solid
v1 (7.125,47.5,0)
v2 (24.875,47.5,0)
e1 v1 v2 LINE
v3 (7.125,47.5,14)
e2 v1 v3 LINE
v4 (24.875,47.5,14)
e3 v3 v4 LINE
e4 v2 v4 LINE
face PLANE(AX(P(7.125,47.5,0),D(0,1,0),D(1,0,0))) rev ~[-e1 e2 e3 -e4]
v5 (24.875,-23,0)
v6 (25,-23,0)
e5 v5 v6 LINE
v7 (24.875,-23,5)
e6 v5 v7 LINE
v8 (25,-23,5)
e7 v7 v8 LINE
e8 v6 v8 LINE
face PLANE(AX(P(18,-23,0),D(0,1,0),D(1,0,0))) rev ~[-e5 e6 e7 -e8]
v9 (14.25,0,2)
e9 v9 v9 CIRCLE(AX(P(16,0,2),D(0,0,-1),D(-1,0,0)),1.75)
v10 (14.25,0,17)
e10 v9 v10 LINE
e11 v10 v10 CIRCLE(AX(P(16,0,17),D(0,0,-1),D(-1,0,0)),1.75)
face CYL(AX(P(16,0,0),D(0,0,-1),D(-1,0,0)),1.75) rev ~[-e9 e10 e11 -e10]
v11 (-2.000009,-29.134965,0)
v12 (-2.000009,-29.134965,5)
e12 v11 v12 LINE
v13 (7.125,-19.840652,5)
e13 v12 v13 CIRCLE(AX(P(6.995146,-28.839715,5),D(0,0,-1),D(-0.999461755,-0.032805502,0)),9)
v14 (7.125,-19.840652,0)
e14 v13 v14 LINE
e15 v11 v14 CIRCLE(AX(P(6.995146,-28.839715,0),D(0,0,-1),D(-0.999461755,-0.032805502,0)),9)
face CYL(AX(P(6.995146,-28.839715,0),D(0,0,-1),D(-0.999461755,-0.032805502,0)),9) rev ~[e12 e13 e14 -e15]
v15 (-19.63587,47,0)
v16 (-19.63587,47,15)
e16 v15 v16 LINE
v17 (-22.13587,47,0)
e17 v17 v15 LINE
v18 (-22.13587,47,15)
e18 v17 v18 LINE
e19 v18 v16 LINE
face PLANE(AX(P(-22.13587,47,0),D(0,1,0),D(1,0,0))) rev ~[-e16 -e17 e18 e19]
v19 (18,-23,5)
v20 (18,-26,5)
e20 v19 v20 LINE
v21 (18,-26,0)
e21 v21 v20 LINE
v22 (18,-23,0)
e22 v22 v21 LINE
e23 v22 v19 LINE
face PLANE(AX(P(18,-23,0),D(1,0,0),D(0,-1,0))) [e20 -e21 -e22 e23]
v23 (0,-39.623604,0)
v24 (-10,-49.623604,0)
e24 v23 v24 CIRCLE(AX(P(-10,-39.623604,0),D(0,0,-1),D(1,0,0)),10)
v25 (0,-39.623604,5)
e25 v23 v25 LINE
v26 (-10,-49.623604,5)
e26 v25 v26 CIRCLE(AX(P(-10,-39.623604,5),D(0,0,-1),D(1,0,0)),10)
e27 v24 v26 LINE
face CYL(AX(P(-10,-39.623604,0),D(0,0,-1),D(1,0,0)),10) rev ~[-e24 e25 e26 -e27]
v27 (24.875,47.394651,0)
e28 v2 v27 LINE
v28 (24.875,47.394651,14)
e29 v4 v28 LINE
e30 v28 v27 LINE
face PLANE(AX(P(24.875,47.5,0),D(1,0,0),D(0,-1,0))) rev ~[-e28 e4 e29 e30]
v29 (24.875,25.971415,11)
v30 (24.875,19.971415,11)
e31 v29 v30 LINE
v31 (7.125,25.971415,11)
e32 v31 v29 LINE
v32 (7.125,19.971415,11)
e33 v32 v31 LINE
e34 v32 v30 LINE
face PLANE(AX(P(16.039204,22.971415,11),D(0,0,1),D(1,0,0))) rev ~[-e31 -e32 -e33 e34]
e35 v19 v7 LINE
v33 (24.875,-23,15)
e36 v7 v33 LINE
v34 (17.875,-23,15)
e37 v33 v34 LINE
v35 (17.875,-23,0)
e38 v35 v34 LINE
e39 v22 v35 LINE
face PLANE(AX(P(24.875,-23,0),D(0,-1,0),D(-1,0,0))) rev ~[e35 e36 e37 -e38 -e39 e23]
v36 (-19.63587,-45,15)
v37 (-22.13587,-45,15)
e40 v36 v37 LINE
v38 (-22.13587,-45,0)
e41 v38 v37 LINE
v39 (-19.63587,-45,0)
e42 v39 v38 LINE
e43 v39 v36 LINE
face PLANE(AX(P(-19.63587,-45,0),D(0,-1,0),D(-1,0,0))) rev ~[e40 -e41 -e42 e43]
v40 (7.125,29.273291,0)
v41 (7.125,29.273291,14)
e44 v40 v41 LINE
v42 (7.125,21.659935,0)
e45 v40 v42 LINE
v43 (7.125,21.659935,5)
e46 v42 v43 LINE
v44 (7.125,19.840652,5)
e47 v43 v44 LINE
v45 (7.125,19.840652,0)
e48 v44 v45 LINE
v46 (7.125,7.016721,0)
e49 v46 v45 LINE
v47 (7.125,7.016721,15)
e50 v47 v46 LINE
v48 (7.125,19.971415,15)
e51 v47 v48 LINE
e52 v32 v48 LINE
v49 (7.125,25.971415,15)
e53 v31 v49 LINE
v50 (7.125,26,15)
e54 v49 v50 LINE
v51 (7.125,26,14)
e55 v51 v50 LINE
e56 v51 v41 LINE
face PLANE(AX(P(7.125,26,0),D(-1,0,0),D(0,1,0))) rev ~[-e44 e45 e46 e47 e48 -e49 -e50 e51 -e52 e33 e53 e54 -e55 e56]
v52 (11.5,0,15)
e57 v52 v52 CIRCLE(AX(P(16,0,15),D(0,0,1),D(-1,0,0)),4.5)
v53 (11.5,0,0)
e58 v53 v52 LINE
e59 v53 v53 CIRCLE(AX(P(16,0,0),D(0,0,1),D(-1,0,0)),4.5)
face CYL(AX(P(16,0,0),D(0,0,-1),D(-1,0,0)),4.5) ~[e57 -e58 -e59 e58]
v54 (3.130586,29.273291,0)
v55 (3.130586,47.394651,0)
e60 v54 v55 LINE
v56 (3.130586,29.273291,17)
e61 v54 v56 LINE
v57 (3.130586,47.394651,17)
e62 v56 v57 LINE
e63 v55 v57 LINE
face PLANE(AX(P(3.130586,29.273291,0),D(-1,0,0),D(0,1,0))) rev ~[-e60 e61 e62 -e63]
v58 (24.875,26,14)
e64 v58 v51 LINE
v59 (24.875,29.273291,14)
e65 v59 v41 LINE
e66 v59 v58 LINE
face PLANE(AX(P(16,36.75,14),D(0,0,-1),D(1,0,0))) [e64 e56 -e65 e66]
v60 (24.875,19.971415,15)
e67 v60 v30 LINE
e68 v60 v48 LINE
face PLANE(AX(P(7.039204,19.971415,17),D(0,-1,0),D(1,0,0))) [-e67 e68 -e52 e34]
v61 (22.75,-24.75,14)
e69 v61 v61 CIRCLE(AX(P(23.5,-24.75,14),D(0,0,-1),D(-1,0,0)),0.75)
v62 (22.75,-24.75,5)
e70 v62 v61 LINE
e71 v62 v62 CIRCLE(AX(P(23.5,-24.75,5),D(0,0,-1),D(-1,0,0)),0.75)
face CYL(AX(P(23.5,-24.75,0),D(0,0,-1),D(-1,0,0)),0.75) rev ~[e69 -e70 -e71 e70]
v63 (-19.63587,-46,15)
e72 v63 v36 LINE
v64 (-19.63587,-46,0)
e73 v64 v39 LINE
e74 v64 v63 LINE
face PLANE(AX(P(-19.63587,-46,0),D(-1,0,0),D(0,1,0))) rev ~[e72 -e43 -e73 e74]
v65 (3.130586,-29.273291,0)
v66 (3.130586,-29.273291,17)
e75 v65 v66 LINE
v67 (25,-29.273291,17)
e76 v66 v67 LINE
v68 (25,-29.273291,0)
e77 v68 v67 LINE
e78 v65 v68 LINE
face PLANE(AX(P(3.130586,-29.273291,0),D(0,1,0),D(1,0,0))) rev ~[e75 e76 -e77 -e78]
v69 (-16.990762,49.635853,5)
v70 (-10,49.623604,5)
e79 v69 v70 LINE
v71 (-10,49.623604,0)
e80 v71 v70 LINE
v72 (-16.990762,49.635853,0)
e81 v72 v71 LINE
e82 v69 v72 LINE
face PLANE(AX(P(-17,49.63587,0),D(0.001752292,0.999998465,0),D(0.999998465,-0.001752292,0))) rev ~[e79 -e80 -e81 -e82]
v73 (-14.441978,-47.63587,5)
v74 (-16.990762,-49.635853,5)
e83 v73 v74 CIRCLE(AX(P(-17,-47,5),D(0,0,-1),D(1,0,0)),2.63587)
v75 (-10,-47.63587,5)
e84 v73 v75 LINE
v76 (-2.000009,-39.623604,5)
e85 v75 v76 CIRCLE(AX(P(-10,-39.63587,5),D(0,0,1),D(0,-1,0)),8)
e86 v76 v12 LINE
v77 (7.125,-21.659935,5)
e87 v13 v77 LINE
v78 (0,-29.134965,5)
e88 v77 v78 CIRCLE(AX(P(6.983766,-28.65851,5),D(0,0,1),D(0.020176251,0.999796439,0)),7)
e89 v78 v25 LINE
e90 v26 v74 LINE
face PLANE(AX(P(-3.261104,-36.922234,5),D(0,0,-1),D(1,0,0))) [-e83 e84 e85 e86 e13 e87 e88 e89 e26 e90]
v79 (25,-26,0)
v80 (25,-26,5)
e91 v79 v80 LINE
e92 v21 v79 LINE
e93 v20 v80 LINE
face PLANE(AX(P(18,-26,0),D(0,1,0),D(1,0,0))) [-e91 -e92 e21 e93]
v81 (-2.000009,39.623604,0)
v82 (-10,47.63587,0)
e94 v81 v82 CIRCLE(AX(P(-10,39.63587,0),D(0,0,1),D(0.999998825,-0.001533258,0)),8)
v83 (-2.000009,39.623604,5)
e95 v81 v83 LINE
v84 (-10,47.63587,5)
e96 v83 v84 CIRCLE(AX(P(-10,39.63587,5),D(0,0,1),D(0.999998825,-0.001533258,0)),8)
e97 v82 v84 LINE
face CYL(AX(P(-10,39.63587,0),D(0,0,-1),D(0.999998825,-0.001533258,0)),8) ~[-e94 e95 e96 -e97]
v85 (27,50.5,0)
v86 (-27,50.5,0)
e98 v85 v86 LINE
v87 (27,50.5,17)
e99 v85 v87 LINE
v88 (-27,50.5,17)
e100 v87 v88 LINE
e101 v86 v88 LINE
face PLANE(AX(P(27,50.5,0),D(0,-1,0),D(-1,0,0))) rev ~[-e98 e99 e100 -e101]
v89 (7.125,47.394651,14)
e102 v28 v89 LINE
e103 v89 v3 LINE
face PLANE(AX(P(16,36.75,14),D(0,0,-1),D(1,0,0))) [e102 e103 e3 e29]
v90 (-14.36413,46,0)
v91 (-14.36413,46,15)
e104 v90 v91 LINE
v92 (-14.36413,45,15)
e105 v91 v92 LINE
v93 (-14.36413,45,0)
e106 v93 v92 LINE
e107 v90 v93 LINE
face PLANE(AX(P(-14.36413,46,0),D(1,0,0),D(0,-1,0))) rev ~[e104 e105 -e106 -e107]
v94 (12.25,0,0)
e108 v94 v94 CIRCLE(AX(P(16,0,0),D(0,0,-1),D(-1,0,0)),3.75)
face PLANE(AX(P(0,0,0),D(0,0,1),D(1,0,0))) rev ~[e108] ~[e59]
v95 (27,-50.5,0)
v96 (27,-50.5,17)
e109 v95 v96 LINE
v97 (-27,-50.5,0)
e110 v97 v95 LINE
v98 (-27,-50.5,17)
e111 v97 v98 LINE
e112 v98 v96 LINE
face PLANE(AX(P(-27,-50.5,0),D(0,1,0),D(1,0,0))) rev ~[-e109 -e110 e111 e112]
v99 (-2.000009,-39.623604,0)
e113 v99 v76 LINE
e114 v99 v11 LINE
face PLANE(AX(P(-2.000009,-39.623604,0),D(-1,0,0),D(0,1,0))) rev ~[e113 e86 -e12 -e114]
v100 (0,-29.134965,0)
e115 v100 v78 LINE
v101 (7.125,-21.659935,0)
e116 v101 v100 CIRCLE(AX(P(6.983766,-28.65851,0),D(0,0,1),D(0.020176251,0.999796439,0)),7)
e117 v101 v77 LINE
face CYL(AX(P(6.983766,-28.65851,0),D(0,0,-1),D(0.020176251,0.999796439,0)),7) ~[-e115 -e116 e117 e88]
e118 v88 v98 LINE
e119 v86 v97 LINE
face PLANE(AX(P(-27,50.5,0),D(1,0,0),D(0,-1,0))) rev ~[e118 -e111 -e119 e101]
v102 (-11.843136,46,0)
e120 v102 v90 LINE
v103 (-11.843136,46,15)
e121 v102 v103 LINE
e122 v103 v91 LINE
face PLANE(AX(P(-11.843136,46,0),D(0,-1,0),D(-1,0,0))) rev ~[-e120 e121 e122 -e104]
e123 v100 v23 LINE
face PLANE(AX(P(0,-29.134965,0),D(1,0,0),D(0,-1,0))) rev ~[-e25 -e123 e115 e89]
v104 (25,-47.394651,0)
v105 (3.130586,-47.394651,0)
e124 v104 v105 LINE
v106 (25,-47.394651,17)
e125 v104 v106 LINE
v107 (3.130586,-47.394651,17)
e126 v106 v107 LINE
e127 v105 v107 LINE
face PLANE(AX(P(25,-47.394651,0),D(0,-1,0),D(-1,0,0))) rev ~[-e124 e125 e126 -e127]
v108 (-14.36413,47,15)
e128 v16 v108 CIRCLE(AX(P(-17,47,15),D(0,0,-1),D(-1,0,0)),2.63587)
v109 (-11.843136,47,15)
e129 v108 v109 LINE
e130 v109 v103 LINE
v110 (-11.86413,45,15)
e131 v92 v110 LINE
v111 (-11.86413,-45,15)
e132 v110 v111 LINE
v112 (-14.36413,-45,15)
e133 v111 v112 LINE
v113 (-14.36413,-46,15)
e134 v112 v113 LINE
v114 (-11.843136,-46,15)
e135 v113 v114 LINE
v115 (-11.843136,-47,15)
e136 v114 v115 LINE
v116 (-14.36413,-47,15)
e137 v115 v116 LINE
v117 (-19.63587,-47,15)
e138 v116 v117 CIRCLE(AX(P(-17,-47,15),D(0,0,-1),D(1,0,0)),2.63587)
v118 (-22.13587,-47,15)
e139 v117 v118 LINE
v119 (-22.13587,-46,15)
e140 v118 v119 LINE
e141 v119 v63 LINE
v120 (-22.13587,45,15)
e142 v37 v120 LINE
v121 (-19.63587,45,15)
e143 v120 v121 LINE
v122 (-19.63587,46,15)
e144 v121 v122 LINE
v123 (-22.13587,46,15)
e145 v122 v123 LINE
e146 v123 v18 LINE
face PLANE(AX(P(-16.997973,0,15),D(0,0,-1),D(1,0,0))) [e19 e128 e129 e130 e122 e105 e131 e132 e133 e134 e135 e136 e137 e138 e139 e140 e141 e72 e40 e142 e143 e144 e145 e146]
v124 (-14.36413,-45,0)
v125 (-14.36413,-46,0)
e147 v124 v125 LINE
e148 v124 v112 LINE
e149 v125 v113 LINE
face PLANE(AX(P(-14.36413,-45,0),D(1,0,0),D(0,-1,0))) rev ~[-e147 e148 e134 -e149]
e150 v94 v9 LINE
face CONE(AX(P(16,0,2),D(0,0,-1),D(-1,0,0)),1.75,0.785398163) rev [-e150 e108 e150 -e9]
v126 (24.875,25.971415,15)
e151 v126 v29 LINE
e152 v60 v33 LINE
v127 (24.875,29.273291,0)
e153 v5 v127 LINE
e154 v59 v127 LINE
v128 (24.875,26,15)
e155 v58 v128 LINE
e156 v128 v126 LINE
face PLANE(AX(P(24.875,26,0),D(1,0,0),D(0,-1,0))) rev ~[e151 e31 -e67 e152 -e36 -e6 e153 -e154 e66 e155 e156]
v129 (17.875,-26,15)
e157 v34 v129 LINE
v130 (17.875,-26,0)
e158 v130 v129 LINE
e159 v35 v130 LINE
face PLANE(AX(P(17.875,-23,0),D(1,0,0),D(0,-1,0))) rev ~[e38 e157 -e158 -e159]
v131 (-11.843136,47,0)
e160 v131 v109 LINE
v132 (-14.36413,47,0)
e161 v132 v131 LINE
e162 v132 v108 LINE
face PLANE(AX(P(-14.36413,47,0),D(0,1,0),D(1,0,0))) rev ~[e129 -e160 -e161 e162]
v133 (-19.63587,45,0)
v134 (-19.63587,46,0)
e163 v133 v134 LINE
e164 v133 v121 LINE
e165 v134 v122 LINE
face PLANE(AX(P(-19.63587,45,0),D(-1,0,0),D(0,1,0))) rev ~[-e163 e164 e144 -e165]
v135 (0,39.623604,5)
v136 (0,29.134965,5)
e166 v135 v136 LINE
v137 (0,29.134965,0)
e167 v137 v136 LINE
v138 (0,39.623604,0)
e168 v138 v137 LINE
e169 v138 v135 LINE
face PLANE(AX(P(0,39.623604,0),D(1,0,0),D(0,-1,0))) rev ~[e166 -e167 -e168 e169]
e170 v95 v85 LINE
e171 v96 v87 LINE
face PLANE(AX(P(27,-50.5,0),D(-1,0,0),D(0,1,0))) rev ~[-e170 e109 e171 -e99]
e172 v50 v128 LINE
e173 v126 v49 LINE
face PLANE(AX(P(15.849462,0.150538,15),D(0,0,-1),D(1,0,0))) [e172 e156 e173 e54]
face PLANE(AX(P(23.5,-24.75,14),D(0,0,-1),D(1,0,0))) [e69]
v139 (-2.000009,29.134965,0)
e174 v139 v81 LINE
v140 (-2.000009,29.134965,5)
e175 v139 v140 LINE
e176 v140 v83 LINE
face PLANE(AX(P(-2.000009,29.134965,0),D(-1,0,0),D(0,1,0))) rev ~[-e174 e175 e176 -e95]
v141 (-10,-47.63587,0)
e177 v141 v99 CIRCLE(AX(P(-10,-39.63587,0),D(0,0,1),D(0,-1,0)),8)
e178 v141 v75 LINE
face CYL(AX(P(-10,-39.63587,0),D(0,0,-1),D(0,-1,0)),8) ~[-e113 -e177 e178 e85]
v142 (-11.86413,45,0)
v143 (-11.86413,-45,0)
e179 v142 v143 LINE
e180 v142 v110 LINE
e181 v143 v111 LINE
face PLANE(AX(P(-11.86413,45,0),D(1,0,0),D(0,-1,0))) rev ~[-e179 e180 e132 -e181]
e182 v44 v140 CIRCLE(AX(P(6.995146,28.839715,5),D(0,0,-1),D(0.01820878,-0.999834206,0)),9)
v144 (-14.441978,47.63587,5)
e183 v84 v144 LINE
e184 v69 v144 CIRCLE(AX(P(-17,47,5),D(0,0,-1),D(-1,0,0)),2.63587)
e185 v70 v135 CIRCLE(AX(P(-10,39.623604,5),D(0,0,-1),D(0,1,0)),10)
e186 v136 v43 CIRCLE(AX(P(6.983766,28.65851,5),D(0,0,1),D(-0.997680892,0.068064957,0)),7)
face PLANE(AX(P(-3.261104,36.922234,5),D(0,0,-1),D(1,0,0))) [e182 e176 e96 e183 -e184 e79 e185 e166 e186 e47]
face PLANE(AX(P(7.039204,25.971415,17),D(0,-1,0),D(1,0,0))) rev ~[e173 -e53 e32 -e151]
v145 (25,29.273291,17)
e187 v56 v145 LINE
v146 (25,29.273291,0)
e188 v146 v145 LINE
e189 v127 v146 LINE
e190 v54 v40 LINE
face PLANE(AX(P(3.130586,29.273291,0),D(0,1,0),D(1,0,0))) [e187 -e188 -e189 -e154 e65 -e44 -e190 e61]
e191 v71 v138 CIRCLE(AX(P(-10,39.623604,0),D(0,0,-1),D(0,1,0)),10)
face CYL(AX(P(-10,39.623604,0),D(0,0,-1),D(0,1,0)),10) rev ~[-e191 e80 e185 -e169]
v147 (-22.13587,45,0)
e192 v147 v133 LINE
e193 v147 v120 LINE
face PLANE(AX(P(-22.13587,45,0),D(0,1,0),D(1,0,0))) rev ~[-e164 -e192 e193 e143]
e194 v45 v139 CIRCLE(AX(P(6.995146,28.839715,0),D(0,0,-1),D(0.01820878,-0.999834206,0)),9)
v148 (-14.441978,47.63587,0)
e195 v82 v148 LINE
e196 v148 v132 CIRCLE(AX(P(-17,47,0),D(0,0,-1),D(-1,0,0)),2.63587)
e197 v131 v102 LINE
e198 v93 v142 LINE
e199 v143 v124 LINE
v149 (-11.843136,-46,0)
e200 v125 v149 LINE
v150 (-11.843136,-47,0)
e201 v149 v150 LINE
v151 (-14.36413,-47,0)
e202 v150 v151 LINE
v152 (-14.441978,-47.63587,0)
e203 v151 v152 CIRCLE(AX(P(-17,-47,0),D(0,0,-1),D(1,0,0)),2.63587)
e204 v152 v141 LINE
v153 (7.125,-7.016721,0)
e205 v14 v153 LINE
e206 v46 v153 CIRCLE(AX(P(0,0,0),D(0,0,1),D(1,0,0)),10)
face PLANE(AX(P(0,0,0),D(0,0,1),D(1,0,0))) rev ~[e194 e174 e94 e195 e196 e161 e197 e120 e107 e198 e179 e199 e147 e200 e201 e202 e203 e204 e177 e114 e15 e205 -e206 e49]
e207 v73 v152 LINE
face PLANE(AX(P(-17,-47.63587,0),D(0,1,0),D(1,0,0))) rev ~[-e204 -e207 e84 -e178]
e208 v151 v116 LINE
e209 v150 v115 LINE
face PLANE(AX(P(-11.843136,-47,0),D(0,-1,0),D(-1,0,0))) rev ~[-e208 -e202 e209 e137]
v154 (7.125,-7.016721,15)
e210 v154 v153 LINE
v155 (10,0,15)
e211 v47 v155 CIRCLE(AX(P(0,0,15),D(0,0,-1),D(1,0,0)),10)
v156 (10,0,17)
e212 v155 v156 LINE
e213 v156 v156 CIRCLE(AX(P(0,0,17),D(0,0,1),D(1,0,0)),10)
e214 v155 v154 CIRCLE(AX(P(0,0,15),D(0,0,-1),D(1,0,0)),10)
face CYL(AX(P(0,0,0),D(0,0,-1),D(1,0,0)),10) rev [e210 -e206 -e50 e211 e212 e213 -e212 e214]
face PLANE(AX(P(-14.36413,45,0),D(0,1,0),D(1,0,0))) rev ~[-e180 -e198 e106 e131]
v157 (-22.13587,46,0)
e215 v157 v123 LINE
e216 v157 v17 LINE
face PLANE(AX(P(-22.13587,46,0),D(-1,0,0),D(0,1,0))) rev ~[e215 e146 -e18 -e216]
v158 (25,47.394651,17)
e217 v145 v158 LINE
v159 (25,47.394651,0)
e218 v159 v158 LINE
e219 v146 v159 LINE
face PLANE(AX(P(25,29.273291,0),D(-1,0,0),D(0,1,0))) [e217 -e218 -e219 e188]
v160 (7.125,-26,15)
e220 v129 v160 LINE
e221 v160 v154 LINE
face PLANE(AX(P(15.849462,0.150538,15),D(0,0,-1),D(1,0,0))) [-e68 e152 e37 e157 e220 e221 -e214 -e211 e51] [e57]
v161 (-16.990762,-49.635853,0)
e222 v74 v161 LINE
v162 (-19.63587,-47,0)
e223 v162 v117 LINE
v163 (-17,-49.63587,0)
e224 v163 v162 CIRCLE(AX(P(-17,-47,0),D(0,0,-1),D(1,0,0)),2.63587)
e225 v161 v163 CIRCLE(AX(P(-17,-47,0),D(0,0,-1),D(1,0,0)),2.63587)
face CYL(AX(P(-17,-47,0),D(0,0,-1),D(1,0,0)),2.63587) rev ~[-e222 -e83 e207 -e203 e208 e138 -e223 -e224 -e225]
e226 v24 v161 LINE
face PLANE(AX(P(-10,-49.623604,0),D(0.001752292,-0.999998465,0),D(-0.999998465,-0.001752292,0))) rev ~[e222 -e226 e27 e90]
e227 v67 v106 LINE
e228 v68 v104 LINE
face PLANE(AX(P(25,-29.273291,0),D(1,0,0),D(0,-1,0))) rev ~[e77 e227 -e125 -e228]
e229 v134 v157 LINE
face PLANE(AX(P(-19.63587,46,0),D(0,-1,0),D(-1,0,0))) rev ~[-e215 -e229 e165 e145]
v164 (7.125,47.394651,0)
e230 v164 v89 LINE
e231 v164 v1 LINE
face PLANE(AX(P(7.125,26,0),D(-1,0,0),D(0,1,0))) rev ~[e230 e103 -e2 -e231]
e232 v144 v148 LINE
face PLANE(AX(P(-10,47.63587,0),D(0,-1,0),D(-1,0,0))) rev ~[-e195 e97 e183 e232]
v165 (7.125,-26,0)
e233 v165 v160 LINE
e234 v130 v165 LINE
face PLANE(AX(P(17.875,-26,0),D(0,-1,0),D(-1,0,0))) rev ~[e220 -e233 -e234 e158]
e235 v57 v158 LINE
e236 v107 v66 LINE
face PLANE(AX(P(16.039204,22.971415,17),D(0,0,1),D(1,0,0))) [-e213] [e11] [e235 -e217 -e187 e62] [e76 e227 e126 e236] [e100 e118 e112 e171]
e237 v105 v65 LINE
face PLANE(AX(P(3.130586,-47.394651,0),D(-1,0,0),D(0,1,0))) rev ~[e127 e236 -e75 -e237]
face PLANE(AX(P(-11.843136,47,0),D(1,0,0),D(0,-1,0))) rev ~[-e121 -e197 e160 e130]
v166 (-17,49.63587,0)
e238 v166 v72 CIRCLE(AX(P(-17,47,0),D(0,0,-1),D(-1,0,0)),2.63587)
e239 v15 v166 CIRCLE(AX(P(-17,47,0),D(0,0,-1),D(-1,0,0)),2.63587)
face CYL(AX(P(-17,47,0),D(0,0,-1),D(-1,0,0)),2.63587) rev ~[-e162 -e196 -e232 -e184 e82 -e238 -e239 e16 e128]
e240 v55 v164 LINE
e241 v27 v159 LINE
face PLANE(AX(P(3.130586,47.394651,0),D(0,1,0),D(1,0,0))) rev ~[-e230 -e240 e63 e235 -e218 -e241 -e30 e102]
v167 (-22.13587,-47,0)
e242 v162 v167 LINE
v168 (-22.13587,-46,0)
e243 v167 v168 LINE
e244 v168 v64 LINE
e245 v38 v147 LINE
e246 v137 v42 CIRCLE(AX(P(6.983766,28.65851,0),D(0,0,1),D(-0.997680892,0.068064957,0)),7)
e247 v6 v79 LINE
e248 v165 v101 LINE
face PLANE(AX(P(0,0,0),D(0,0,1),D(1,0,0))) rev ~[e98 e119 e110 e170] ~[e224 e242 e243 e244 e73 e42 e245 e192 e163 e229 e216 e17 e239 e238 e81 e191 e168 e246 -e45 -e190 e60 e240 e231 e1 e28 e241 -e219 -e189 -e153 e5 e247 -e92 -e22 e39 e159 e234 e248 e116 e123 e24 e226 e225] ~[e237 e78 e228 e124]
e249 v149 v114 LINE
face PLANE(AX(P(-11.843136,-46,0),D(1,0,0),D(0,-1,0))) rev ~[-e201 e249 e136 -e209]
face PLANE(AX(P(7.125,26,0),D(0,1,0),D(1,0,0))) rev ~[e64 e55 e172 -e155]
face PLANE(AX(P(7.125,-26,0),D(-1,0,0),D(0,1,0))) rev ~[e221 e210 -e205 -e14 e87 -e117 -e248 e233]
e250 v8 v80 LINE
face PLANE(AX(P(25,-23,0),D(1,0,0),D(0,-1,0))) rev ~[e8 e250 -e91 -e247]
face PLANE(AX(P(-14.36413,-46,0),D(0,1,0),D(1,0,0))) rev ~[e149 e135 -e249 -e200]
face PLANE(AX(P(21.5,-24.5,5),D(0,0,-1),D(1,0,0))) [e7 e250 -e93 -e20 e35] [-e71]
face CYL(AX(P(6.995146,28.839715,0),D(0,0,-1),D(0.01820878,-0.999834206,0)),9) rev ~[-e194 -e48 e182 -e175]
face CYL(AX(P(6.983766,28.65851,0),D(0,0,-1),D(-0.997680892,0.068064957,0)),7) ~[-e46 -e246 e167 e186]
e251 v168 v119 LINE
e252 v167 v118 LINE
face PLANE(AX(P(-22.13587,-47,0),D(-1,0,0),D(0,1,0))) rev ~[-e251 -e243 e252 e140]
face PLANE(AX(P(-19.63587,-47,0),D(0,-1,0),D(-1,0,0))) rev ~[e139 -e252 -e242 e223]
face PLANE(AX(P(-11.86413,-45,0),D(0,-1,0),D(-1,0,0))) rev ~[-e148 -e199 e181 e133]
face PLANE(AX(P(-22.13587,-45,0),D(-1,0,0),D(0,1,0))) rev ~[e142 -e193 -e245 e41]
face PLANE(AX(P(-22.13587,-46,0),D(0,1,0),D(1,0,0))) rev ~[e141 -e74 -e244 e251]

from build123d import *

# Parameters (mm, degrees)
F0_R      = 10
F0_W      = 21.869414486
F0_H      = 18.1213598698
F1_DEPTH  = 17
F3_DEPTH  = 15
F4_W      = 7
F4_H      = 3
F5_DEPTH  = 5
F7_DEPTH  = 14
F8_SIZE   = 2
F9_W      = 18
F9_H      = 6
F10_DEPTH = 6


# Not quite as in the source:
# - a feature names something its author has since deleted; it is built from what else it names


with BuildPart() as f1:
    # F0 (on Top) → F1 (new body)
    with BuildSketch(Plane.XY):
        Polygon((27, -38.3339710534), (27, 50.5), (-27, 50.5), (-27, -50.5), (27, -50.5), align=None)
        Polygon((25, -29.2732911184), (25, -38.3339710534), (25, -47.3946509883), (3.130585514, -47.3946509883), (3.130585514, -29.2732911184), align=None, mode=Mode.SUBTRACT)
        Circle(F0_R, mode=Mode.SUBTRACT)
        with BuildLine():
            ThreePointArc((17.75, 0), (16, -1.75), (14.25, 0))
            ThreePointArc((14.25, 0), (16, 1.75), (17.75, 0))
        make_face(mode=Mode.SUBTRACT)
        with Locations((14.065292757, 38.3339710534)):
            Rectangle(F0_W, F0_H, mode=Mode.SUBTRACT)
    extrude(amount=F1_DEPTH)

    # F2 (on face) → F3 (cut)
    with BuildSketch(Plane(origin=(0, 0, 0), x_dir=(1, 0, 0), z_dir=(0, 0, -1))):
        Polygon((7.125, 26), (7.125, 0), (7.125, -26), (24.875, -26), (24.875, 23), (17.875, 23), (17.875, 26), align=None)
        with BuildLine():
            ThreePointArc((20.5, 0), (16, -4.5), (11.5, 0))
            ThreePointArc((11.5, 0), (16, 4.5), (20.5, 0))
        make_face(mode=Mode.SUBTRACT)
        with BuildLine():
            Line((-11.8641304348, -45), (-11.8641304348, 0))
            Line((-11.8641304348, 0), (-11.8641304348, 45))
            Line((-11.8641304348, 45), (-14.3641304348, 45))
            Line((-14.3641304348, 45), (-14.3641304348, 46))
            Line((-14.3641304348, 46), (-11.8431356333, 46))
            Line((-11.8431356333, 46), (-11.8431356333, 47))
            Line((-11.8431356333, 47), (-14.3641304348, 47))
            ThreePointArc((-14.3641304348, 47), (-17, 49.6358695652), (-19.6358695652, 47))
            Line((-19.6358695652, 47), (-22.1358695652, 47))
            Line((-22.1358695652, 47), (-22.1358695652, 46))
            Line((-22.1358695652, 46), (-19.6358695652, 46))
            Line((-19.6358695652, 46), (-19.6358695652, 45))
            Line((-19.6358695652, 45), (-22.1358695652, 45))
            Line((-22.1358695652, 45), (-22.1358695652, -45))
            Line((-22.1358695652, -45), (-19.6358695652, -45))
            Line((-19.6358695652, -45), (-19.6358695652, -46))
            Line((-19.6358695652, -46), (-22.1358695652, -46))
            Line((-22.1358695652, -46), (-22.1358695652, -47))
            Line((-22.1358695652, -47), (-19.6358695652, -47))
            ThreePointArc((-19.6358695652, -47), (-17, -49.6358695652), (-14.3641304348, -47))
            Line((-14.3641304348, -47), (-11.8431356333, -47))
            Line((-11.8431356333, -47), (-11.8431356333, -46))
            Line((-11.8431356333, -46), (-14.3641304348, -46))
            Line((-14.3641304348, -46), (-14.3641304348, -45))
            Line((-14.3641304348, -45), (-11.8641304348, -45))
        make_face()
    extrude(amount=-F3_DEPTH, mode=Mode.SUBTRACT)

    # F4 (on face) → F5 (cut)
    with BuildSketch(Plane(origin=(0, 0, 0), x_dir=(1, 0, 0), z_dir=(0, 0, -1))):
        with Locations((21.5, 24.5)):
            Rectangle(F4_W, F4_H)
        with BuildLine():
            Line((0, 29.1349645704), (0, 39.6236035006))
            ThreePointArc((0, 39.6236035006), (-2.9289321881, 46.6946713125), (-10, 49.6236035006))
            Line((-10, 49.6236035006), (-17, 49.6358695652))
            Line((-17, 49.6358695652), (-17, 47.6358695652))
            Line((-17, 47.6358695652), (-10, 47.6358695652))
            ThreePointArc((-10, 47.6358695652), (-4.3388107028, 45.2883854424), (-2.0000094035, 39.6236035006))
            Line((-2.0000094035, 39.6236035006), (-2.0000094035, 29.1349645704))
            ThreePointArc((-2.0000094035, 29.1349645704), (0.5848933582, 22.5223852264), (7.1590254083, 19.8412071913))
            Line((7.1590254083, 19.8412071913), (7.125, 21.6599348028))
            ThreePointArc((7.125, 21.6599348028), (1.9168065811, 23.8288183935), (0, 29.1349645704))
        make_face()
        with BuildLine():
            ThreePointArc((7.1590254083, -19.8412071913), (0.5848933582, -22.5223852264), (-2.0000094035, -29.1349645704))
            Line((-2.0000094035, -29.1349645704), (-2.0000094035, -39.6236035006))
            ThreePointArc((-2.0000094035, -39.6236035006), (-4.3388107028, -45.2883854424), (-10, -47.6358695652))
            Line((-10, -47.6358695652), (-17, -47.6358695652))
            Line((-17, -47.6358695652), (-17, -49.6358695652))
            Line((-17, -49.6358695652), (-10, -49.6236035006))
            ThreePointArc((-10, -49.6236035006), (-2.9289321881, -46.6946713125), (0, -39.6236035006))
            Line((0, -39.6236035006), (0, -29.1349645704))
            ThreePointArc((0, -29.1349645704), (1.9168065811, -23.8288183935), (7.125, -21.6599348028))
            Line((7.125, -21.6599348028), (7.1590254083, -19.8412071913))
        make_face()
    extrude(amount=-F5_DEPTH, mode=Mode.SUBTRACT)

    # F6 (on face) → F7 (cut)
    with BuildSketch(Plane(origin=(0, 0, 0), x_dir=(1, 0, 0), z_dir=(0, 0, -1))):
        with BuildLine():
            ThreePointArc((24.25, 24.75), (23.5, 25.5), (22.75, 24.75))
            ThreePointArc((22.75, 24.75), (23.5, 24), (24.25, 24.75))
        make_face()
        Polygon((7.125, -26), (7.125, -36.75), (7.125, -47.5), (24.875, -47.5), (24.875, -26), align=None)
    extrude(amount=-F7_DEPTH, mode=Mode.SUBTRACT)

    # F8
    f8_edges = [f1.edges().sort_by_distance(p)[0] for p in [
        (14.25, 0, 0),
    ]]
    chamfer(f8_edges, length=F8_SIZE)

    # F9 (on face) → F10 (join)
    with BuildSketch(Plane.XY.offset(17)):
        with Locations((16.0392038773, 22.9714149609)):
            Rectangle(F9_W, F9_H)
    extrude(amount=-F10_DEPTH)


solid = f1.part
